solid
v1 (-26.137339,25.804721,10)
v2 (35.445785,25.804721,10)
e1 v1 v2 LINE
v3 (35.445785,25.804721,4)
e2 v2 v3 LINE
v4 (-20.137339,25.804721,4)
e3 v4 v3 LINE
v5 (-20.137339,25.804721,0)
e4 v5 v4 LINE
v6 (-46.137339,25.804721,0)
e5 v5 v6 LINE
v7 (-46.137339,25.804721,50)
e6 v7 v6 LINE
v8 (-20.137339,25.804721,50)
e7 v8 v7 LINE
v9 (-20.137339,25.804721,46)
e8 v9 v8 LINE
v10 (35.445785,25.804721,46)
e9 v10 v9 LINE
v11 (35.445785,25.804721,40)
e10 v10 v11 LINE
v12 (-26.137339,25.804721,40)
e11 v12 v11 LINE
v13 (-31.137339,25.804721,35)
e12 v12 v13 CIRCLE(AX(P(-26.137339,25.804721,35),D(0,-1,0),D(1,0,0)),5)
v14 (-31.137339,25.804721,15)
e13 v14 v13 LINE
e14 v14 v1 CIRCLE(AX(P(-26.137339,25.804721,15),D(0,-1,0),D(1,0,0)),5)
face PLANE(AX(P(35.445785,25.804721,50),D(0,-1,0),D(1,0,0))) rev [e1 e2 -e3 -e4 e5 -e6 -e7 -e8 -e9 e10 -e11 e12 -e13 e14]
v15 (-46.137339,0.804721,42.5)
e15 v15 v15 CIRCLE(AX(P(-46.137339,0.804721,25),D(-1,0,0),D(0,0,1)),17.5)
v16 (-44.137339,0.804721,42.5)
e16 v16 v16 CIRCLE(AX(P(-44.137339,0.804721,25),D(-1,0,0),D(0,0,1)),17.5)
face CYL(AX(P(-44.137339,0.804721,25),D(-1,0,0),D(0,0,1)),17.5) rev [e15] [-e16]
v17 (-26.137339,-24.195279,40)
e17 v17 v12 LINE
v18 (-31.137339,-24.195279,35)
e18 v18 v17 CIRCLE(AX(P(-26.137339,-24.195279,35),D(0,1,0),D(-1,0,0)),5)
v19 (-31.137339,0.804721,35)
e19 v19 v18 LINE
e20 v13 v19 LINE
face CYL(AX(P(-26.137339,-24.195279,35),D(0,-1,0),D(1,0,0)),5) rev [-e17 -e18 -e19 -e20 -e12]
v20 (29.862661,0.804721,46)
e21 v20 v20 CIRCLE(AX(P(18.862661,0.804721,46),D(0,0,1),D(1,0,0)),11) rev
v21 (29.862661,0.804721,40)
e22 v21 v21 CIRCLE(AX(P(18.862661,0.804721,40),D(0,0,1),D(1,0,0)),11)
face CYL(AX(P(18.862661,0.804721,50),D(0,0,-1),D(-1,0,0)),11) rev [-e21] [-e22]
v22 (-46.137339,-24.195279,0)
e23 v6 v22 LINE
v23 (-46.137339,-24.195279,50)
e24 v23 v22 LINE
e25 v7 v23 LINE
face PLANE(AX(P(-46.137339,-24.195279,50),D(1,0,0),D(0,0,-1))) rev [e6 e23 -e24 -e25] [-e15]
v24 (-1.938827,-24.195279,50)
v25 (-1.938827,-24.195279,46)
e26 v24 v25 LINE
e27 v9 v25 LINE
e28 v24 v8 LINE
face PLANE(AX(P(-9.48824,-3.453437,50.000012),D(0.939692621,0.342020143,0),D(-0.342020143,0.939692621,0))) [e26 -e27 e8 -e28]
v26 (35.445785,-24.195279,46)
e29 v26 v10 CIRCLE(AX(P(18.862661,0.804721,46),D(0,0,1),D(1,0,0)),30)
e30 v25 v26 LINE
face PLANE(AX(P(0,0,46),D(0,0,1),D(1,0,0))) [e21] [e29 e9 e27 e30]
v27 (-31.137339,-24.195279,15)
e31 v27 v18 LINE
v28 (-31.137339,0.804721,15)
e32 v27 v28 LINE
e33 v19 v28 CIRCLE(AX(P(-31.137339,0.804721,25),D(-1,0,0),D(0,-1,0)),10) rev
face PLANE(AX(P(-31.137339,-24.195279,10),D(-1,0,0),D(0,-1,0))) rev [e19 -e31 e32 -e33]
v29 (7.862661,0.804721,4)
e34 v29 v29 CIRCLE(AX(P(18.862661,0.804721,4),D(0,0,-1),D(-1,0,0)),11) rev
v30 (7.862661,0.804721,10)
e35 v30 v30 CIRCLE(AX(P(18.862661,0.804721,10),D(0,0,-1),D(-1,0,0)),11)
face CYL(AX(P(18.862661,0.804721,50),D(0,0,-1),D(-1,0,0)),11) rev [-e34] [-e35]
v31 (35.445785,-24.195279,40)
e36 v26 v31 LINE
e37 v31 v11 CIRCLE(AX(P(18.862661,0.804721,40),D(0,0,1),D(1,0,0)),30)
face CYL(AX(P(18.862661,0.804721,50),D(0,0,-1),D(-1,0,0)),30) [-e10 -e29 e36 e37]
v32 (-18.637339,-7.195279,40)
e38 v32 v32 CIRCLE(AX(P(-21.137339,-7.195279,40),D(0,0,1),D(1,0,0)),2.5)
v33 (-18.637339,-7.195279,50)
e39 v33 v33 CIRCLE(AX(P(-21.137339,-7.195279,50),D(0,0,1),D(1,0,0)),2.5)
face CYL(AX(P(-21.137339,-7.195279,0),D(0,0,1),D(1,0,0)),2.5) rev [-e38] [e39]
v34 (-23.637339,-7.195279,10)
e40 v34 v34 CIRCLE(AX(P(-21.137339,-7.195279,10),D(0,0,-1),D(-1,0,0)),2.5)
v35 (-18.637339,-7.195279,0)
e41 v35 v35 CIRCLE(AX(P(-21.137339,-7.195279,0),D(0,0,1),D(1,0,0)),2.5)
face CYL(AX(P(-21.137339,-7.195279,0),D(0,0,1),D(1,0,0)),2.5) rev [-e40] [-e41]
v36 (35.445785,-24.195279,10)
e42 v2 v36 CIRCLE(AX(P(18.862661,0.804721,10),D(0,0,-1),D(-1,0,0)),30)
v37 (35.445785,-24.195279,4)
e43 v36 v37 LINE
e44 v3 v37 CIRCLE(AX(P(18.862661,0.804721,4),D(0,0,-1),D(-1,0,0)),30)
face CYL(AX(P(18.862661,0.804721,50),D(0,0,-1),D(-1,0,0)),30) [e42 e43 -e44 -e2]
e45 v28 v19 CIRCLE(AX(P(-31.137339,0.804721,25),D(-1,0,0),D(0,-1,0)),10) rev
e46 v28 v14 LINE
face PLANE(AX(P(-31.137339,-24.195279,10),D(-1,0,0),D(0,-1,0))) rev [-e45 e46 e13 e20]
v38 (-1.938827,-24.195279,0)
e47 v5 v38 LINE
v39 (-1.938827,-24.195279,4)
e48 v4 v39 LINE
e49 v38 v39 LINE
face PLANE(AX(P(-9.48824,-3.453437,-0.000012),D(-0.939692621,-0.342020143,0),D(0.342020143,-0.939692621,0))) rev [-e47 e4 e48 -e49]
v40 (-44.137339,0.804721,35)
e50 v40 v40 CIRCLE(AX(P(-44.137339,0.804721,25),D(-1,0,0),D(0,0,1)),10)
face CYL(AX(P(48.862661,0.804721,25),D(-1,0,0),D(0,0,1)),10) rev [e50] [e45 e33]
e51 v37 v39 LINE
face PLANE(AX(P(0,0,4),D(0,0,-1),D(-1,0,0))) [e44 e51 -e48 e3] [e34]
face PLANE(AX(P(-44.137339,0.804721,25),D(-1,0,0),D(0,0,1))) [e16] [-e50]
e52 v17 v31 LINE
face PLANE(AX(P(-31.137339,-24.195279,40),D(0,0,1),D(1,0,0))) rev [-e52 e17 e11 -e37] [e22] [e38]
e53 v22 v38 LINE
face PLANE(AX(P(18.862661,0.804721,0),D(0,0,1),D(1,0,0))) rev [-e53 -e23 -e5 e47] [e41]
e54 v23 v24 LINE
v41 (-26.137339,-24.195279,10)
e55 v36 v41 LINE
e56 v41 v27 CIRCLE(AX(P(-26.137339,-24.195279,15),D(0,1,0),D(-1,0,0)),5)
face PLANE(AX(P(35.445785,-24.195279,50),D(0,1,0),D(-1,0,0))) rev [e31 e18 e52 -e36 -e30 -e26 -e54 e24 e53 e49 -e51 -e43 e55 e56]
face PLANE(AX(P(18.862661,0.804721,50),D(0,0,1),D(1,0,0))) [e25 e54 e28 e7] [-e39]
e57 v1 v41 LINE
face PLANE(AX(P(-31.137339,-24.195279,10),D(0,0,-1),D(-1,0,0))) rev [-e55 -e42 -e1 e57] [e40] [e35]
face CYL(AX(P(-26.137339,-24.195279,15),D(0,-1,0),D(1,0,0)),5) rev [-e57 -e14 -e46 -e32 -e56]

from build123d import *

# Parameters (mm, degrees)
SKETCH1_R               = 11
BOSS_EXTRUDE1_DEPTH     = 50
SKETCH2_R               = 17.5
CUT_EXTRUDE1_DEPTH      = 2
SKETCH3_R               = 10
CUT_EXTRUDE2_DEPTH      = 109.696290771
CUT_EXTRUDE3_DEPTH      = 75.521428374
CUT_EXTRUDE3_DEPTH_BACK = 4
SKETCH4_R               = 11
CUT_EXTRUDE4_DEPTH      = 75.521428307
CUT_EXTRUDE4_DEPTH_BACK = 4
SKETCH5_R               = 11
SKETCH6_W               = 90
SKETCH6_H               = 30
CUT_EXTRUDE5_DEPTH      = 86.950914215
SKETCH7_R               = 2.5
CUT_EXTRUDE6_DEPTH      = 75.521428207
FILLET2_R               = 5


with BuildPart() as part:
    # Sketch1 → Boss-Extrude1 (new body)
    with BuildSketch(Plane.XY):
        with BuildLine():
            Line((35.445784896, -24.19527897), (-46.137339056, -24.19527897))
            Line((-46.137339056, -24.19527897), (-46.137339056, 25.80472103))
            Line((-46.137339056, 25.80472103), (35.445784896, 25.80472103))
            ThreePointArc((35.445784896, 25.80472103), (48.862660944, 0.80472103), (35.445784896, -24.19527897))
        make_face()
        with Locations((18.862660944, 0.80472103)):
            Circle(SKETCH1_R, mode=Mode.SUBTRACT)
    extrude(amount=BOSS_EXTRUDE1_DEPTH)

    # Sketch2 → Cut-Extrude1 (cut)
    with BuildSketch(Plane.ZY.offset(46.137339056)):
        with Locations((25, 0.80472103)):
            Circle(SKETCH2_R)
    extrude(amount=-CUT_EXTRUDE1_DEPTH, mode=Mode.SUBTRACT)

    # Sketch3 → Cut-Extrude2 (cut, through all)
    with BuildSketch(Plane.ZY.offset(44.137339056)):
        with Locations((25, 0.80472103)):
            Circle(SKETCH3_R)
    extrude(amount=-CUT_EXTRUDE2_DEPTH, mode=Mode.SUBTRACT)

    # Sketch4 → Cut-Extrude3 (cut, two sides: drawn at the far end of the back side and taken through both)
    with BuildSketch(Plane.XY.offset(50).offset(-CUT_EXTRUDE3_DEPTH_BACK)):
        with BuildLine():
            Line((35.445784896, 25.80472103), (-20.137339056, 25.80472103))
            Line((-20.137339056, 25.80472103), (-1.938827342, -24.19527897))
            Line((-1.938827342, -24.19527897), (35.445784896, -24.19527897))
            ThreePointArc((35.445784896, -24.19527897), (48.862660944, 0.80472103), (35.445784896, 25.80472103))
        make_face()
        with Locations((18.862660944, 0.80472103)):
            Circle(SKETCH4_R, mode=Mode.SUBTRACT)
    extrude(amount=CUT_EXTRUDE3_DEPTH + CUT_EXTRUDE3_DEPTH_BACK, mode=Mode.SUBTRACT)

    # Sketch5 → Cut-Extrude4 (cut, two sides: drawn at the far end of the back side and taken through both)
    with BuildSketch(Plane(origin=(0, 0, 0), x_dir=(-1, 0, 0), z_dir=(0, 0, -1)).offset(-CUT_EXTRUDE4_DEPTH_BACK)):
        with BuildLine():
            Line((1.938827342, -24.19527897), (20.137339056, 25.80472103))
            Line((20.137339056, 25.80472103), (-35.445784896, 25.80472103))
            ThreePointArc((-35.445784896, 25.80472103), (-48.862660944, 0.80472103), (-35.445784896, -24.19527897))
            Line((-35.445784896, -24.19527897), (1.938827342, -24.19527897))
        make_face()
        with Locations((-18.862660944, 0.80472103)):
            Circle(SKETCH5_R, mode=Mode.SUBTRACT)
    extrude(amount=CUT_EXTRUDE4_DEPTH + CUT_EXTRUDE4_DEPTH_BACK, mode=Mode.SUBTRACT)

    # Sketch6 → Cut-Extrude5 (cut, through all)
    with BuildSketch(Plane(origin=(0, 25.80472103, 0), x_dir=(1, 0, 0), z_dir=(0, 1, 0))):
        with Locations((13.862660944, -25)):
            Rectangle(SKETCH6_W, SKETCH6_H)
    extrude(amount=-CUT_EXTRUDE5_DEPTH, mode=Mode.SUBTRACT)

    # Sketch7 → Cut-Extrude6 (cut, through all)
    with BuildSketch(Plane.XY.offset(50)):
        with Locations((-21.137339056, -7.19527897)):
            Circle(SKETCH7_R)
    extrude(amount=-CUT_EXTRUDE6_DEPTH, mode=Mode.SUBTRACT)

    # Fillet2
    fillet2_edges = [part.edges().sort_by_distance(p)[0] for p in [
        (-31.137339056, 0.80472103, 10),
        (-31.137339056, 0.80472103, 40),
    ]]
    fillet(fillet2_edges, radius=FILLET2_R - 0.0001)  # a hair under: the kernel refuses the full size


solid = part.part
